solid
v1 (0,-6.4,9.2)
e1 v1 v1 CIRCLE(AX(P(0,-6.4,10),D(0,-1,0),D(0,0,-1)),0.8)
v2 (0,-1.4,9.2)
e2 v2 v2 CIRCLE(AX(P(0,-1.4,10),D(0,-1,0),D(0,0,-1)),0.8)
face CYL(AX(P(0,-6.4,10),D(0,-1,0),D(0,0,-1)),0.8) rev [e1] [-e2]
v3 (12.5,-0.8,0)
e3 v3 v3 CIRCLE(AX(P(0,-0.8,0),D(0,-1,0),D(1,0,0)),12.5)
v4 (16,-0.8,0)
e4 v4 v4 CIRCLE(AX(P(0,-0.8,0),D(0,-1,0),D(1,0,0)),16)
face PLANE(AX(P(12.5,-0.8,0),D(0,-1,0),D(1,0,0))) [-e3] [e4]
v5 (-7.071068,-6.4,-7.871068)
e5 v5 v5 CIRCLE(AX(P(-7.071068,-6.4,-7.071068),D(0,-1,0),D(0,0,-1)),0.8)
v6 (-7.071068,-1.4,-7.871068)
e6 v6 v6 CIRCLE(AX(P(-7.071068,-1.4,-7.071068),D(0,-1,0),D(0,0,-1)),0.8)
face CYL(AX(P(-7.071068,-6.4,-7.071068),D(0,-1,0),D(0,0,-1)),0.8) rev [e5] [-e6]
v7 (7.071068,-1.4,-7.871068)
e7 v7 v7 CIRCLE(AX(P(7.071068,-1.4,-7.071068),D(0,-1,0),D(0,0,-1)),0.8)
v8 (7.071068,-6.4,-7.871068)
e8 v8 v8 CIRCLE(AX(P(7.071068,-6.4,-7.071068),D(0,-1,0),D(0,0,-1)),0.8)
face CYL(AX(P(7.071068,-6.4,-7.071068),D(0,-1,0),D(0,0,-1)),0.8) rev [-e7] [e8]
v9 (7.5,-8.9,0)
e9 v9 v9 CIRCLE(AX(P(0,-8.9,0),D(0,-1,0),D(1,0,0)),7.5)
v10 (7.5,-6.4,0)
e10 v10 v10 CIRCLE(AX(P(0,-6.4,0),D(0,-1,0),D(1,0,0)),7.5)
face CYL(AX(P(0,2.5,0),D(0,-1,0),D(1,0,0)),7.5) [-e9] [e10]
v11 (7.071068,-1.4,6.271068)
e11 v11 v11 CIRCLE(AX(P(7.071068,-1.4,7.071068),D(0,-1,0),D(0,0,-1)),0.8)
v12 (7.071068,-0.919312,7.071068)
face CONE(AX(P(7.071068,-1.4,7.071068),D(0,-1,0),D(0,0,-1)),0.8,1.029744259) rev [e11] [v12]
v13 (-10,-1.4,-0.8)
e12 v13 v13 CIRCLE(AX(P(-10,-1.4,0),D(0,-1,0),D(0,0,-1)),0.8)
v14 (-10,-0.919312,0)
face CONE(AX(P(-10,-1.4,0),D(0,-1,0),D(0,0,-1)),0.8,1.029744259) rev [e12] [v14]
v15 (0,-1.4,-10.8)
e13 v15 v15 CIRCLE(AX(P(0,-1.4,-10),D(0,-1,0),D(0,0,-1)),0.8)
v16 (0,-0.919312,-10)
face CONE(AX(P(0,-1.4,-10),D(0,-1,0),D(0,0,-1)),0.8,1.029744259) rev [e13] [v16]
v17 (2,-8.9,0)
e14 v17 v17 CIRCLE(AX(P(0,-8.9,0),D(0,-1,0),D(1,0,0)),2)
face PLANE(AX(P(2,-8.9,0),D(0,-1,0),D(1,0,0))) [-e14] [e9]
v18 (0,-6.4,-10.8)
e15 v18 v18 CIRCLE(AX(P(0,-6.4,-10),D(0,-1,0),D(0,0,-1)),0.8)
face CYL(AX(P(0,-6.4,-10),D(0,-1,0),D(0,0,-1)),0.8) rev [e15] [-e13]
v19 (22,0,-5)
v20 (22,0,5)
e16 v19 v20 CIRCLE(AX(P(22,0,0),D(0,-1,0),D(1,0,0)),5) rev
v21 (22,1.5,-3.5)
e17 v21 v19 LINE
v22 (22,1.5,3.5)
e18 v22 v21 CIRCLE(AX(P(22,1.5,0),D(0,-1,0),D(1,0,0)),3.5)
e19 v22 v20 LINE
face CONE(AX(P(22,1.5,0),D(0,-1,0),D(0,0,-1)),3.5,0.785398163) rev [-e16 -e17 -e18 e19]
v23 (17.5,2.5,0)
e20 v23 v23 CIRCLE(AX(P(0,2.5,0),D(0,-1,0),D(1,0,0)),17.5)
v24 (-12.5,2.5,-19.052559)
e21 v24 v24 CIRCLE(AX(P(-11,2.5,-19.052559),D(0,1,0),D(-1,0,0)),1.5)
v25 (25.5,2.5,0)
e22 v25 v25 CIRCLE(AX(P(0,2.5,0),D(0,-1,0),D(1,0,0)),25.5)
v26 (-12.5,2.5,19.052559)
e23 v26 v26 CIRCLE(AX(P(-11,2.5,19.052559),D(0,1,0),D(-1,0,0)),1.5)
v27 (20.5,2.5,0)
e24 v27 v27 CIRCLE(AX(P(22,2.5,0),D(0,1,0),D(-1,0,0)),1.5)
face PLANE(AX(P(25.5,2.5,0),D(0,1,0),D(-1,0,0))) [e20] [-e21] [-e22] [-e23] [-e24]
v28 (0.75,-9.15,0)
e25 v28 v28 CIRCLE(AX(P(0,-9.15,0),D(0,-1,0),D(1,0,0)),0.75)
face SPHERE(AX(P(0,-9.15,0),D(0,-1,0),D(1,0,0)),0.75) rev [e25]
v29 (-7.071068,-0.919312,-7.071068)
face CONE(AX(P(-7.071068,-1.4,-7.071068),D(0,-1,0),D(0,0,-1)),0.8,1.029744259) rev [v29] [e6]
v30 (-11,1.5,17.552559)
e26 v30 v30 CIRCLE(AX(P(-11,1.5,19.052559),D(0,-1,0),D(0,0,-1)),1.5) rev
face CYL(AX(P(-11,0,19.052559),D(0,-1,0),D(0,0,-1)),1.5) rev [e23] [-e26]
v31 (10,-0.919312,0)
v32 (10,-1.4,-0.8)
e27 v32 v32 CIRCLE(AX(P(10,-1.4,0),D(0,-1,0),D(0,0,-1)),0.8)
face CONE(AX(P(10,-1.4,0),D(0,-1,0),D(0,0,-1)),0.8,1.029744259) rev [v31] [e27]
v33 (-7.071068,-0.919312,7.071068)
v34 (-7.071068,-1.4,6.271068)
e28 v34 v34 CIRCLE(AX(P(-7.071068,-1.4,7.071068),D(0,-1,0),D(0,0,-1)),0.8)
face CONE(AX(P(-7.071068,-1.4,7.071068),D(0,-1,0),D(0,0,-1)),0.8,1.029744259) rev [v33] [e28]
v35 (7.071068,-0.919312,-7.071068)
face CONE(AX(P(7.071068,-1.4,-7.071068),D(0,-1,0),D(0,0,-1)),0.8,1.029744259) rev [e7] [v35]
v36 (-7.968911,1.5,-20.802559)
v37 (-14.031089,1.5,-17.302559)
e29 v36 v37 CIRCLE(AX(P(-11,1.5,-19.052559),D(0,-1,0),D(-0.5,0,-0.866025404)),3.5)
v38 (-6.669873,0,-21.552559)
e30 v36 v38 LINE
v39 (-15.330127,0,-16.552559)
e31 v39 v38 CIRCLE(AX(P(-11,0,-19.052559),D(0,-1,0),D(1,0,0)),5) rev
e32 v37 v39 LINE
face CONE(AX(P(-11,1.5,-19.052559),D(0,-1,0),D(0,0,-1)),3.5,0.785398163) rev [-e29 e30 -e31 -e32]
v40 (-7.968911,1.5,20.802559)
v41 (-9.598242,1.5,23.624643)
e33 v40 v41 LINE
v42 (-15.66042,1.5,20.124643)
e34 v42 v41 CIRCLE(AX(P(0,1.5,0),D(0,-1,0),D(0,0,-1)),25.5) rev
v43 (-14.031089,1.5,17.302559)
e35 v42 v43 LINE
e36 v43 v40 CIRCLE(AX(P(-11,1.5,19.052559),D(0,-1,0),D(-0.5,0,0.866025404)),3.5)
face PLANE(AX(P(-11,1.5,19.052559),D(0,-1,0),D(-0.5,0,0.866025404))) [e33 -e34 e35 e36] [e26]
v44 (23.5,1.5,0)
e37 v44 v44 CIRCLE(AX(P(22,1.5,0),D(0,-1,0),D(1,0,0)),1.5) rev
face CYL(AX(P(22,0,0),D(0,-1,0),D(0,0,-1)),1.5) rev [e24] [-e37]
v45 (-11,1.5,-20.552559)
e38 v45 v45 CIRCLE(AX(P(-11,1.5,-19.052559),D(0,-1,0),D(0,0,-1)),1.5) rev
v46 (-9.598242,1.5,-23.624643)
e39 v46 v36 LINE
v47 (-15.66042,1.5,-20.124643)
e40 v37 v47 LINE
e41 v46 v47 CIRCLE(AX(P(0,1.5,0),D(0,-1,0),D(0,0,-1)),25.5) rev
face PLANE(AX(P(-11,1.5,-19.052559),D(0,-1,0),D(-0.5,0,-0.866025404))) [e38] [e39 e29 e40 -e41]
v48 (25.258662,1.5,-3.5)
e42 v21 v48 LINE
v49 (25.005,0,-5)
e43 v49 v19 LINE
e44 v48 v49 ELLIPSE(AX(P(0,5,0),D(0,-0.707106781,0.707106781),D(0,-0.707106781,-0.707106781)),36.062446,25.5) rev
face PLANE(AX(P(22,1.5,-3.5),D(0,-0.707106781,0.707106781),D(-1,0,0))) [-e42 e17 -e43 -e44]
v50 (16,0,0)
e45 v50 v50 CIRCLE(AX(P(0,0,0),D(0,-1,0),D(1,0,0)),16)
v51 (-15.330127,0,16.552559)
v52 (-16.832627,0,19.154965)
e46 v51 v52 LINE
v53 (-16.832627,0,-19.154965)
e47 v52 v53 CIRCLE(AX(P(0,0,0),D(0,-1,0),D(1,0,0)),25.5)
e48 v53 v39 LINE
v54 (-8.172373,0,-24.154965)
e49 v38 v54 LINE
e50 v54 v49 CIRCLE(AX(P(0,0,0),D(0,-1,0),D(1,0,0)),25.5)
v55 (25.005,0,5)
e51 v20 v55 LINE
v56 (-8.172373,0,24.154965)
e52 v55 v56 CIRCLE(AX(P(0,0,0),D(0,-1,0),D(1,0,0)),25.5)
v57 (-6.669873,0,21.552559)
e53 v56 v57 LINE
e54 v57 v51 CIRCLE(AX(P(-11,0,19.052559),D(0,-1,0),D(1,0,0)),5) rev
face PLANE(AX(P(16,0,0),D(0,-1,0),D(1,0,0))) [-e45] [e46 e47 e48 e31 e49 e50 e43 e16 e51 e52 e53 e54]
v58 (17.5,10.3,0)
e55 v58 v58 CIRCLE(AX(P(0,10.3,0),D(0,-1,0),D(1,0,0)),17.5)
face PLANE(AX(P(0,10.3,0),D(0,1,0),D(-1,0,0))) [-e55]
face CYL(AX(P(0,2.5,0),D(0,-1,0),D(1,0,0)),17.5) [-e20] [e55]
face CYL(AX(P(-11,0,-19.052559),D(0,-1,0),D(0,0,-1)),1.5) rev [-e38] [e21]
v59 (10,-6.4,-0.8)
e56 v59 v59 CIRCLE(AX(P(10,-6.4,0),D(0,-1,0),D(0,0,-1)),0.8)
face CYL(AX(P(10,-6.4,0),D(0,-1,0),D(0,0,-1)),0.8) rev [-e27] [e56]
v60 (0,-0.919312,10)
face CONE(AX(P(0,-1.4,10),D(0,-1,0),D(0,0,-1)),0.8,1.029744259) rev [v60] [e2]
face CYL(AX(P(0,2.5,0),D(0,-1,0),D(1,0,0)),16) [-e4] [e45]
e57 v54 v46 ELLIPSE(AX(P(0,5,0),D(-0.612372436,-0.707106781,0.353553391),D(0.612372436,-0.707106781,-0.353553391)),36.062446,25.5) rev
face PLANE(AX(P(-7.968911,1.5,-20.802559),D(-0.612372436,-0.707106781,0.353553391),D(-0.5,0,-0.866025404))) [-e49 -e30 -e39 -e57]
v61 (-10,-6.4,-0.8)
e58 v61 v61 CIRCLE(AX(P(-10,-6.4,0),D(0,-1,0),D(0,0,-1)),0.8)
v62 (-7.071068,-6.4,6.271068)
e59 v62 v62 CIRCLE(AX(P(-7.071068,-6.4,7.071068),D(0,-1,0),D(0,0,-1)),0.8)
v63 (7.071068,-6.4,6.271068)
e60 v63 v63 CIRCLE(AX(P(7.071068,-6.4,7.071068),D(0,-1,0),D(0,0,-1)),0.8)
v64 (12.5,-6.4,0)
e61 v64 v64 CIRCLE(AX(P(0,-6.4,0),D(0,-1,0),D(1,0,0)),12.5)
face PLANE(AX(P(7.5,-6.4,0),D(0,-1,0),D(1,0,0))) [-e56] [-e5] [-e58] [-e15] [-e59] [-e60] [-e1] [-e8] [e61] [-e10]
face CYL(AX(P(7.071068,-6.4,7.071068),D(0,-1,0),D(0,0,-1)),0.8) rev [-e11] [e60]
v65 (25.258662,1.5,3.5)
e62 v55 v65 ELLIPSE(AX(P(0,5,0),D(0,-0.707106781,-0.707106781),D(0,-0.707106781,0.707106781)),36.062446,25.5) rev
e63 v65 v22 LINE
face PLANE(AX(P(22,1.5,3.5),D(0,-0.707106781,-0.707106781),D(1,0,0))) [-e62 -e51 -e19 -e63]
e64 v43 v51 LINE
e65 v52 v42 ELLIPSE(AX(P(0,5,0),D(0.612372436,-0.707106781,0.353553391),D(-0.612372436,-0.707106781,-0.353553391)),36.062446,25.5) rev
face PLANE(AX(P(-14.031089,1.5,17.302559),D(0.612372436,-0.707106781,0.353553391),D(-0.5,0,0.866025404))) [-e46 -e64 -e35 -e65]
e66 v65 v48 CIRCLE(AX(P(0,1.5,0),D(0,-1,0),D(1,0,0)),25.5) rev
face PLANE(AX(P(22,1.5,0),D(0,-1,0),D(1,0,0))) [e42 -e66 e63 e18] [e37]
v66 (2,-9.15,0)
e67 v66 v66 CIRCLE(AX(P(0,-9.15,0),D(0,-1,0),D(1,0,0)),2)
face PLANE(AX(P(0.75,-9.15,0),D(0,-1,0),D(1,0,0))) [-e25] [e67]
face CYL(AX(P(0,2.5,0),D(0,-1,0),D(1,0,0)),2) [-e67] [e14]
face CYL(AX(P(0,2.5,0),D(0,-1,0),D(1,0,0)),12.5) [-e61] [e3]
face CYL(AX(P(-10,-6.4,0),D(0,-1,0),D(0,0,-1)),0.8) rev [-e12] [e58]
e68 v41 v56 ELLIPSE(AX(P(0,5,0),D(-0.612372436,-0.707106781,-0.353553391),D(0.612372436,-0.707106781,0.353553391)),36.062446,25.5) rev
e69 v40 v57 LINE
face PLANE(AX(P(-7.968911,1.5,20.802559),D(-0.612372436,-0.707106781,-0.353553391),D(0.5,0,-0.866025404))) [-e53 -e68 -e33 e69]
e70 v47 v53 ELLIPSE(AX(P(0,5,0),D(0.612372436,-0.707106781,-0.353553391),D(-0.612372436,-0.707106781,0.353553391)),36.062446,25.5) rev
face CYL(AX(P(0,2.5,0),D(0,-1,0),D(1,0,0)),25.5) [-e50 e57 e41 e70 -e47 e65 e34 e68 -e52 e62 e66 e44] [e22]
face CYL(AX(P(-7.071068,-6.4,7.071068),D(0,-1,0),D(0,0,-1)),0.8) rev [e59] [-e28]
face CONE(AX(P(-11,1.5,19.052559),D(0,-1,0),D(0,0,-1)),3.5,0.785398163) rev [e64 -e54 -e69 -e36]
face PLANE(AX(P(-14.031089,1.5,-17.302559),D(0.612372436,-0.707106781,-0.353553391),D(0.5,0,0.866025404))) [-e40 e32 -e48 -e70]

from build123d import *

# Parameters (mm, degrees)
F_3_0MM_DOWEL_HOLE1_D        = 3
CUT_EXTRUDE1_DEPTH           = 1.5
CHAMFER1_SIZE                = 1.5
CIRPATTERN1_COUNT            = 3
CHAMFER1_OF_CIRPATTERN1_SIZE = 1.5
CIRPATTERN2_COUNT            = 8


with BuildPart() as part:
    # Sketch1 → Revolve1 (revolve)
    with BuildSketch(Plane.XY):
        with BuildLine():
            Line((16, 0), (25.5, 0))
            Line((25.5, 0), (25.5, 2.5))
            Line((25.5, 2.5), (17.5, 2.5))
            Line((17.5, 2.5), (17.5, 10.3))
            Line((17.5, 10.3), (0, 10.3))
            Line((0, 10.3), (0, 2.5))
            Line((0, 2.5), (0, 0))
            Line((0, 0), (0, -0.8))
            Line((0, -0.8), (0, -6.4))
            Line((0, -6.4), (0, -8.4))
            ThreePointArc((0, -8.4), (0.530330086, -8.619669914), (0.75, -9.15))
            Line((0.75, -9.15), (2, -9.15))
            Line((2, -9.15), (2, -8.9))
            Line((2, -8.9), (7.5, -8.9))
            Line((7.5, -8.9), (7.5, -6.4))
            Line((7.5, -6.4), (12.5, -6.4))
            Line((12.5, -6.4), (12.5, -0.8))
            Line((12.5, -0.8), (16, -0.8))
            Line((16, -0.8), (16, 0))
        make_face()
    revolve(axis=Axis((0, 2.5, 0), (0, 1, 0)))

    # Ø3.0mm Dowel Hole1 (through all)
    with Locations(Plane(origin=(0, 0, 0), x_dir=(-1, 0, 0), z_dir=(0, -1, 0))):
        with Locations((-22, 0)):
            f_3_0mm_dowel_hole1 = Hole(F_3_0MM_DOWEL_HOLE1_D / 2)

    # Sketch5 → Cut-Extrude1 (cut)
    with BuildSketch(Plane.XZ):
        with BuildLine():
            Line((22, -3.5), (25.5, -3.5))
            Line((25.5, -3.5), (25.5, 3.5))
            Line((25.5, 3.5), (22, 3.5))
            ThreePointArc((22, 3.5), (18.5, 0), (22, -3.5))
        make_face()
    cut_extrude1 = extrude(amount=-CUT_EXTRUDE1_DEPTH, mode=Mode.SUBTRACT)

    # Chamfer1
    chamfer1_edges = [part.edges().sort_by_distance(p)[0] for p in [
        (23.62933094, 0, -3.5),
        (18.5, 0, 0),
        (23.62933094, 0, 3.5),
    ]]
    chamfer(chamfer1_edges, length=CHAMFER1_SIZE - 0.0001)  # a hair under: the kernel refuses the full size

    # CirPattern1: Ø3.0mm Dowel Hole1, Cut-Extrude1 ×3 about axis
    cirpattern1_axis = Axis((0, 0, 0), (0, 1, 0))
    add([f_3_0mm_dowel_hole1.rotate(cirpattern1_axis, i * 360 / CIRPATTERN1_COUNT) for i in range(1, CIRPATTERN1_COUNT)], mode=Mode.SUBTRACT)
    add([cut_extrude1.rotate(cirpattern1_axis, i * 360 / CIRPATTERN1_COUNT) for i in range(1, CIRPATTERN1_COUNT)], mode=Mode.SUBTRACT)

    # Chamfer1 of CirPattern1
    chamfer1_of_cirpattern1_edges = [part.edges().sort_by_distance(p)[0] for p in [
        (-14.845754383, 0, -18.713600869),
        (-9.25, 0, -16.02146997),
        (-8.783576557, 0, -22.213600869),
        (-8.783576557, 0, 22.213600869),
        (-9.25, 0, 16.02146997),
        (-14.845754383, 0, 18.713600869),
    ]]
    chamfer(chamfer1_of_cirpattern1_edges, length=CHAMFER1_OF_CIRPATTERN1_SIZE - 0.0001)  # a hair under: the kernel refuses the full size

    # Sketch7 → M2 Tapped Hole1 (revolve, cut)
    with BuildSketch(Plane(origin=(10, -6.4, 0), x_dir=(0, 0, -1), z_dir=(1, 0, 0))):
        Polygon((0, 0), (0, 5.480688495), (0.8, 5), (0.8, 0), align=None)
    m2_tapped_hole1 = revolve(axis=Axis((10, -12.75, 0), (0, 1, 0)), mode=Mode.SUBTRACT)

    # CirPattern2: M2 Tapped Hole1 ×8 about axis
    cirpattern2_axis = Axis((0, 0, 0), (0, 1, 0))
    for i in range(1, CIRPATTERN2_COUNT):
        add(m2_tapped_hole1.rotate(cirpattern2_axis, i * 360 / CIRPATTERN2_COUNT), mode=Mode.SUBTRACT)


solid = part.part
